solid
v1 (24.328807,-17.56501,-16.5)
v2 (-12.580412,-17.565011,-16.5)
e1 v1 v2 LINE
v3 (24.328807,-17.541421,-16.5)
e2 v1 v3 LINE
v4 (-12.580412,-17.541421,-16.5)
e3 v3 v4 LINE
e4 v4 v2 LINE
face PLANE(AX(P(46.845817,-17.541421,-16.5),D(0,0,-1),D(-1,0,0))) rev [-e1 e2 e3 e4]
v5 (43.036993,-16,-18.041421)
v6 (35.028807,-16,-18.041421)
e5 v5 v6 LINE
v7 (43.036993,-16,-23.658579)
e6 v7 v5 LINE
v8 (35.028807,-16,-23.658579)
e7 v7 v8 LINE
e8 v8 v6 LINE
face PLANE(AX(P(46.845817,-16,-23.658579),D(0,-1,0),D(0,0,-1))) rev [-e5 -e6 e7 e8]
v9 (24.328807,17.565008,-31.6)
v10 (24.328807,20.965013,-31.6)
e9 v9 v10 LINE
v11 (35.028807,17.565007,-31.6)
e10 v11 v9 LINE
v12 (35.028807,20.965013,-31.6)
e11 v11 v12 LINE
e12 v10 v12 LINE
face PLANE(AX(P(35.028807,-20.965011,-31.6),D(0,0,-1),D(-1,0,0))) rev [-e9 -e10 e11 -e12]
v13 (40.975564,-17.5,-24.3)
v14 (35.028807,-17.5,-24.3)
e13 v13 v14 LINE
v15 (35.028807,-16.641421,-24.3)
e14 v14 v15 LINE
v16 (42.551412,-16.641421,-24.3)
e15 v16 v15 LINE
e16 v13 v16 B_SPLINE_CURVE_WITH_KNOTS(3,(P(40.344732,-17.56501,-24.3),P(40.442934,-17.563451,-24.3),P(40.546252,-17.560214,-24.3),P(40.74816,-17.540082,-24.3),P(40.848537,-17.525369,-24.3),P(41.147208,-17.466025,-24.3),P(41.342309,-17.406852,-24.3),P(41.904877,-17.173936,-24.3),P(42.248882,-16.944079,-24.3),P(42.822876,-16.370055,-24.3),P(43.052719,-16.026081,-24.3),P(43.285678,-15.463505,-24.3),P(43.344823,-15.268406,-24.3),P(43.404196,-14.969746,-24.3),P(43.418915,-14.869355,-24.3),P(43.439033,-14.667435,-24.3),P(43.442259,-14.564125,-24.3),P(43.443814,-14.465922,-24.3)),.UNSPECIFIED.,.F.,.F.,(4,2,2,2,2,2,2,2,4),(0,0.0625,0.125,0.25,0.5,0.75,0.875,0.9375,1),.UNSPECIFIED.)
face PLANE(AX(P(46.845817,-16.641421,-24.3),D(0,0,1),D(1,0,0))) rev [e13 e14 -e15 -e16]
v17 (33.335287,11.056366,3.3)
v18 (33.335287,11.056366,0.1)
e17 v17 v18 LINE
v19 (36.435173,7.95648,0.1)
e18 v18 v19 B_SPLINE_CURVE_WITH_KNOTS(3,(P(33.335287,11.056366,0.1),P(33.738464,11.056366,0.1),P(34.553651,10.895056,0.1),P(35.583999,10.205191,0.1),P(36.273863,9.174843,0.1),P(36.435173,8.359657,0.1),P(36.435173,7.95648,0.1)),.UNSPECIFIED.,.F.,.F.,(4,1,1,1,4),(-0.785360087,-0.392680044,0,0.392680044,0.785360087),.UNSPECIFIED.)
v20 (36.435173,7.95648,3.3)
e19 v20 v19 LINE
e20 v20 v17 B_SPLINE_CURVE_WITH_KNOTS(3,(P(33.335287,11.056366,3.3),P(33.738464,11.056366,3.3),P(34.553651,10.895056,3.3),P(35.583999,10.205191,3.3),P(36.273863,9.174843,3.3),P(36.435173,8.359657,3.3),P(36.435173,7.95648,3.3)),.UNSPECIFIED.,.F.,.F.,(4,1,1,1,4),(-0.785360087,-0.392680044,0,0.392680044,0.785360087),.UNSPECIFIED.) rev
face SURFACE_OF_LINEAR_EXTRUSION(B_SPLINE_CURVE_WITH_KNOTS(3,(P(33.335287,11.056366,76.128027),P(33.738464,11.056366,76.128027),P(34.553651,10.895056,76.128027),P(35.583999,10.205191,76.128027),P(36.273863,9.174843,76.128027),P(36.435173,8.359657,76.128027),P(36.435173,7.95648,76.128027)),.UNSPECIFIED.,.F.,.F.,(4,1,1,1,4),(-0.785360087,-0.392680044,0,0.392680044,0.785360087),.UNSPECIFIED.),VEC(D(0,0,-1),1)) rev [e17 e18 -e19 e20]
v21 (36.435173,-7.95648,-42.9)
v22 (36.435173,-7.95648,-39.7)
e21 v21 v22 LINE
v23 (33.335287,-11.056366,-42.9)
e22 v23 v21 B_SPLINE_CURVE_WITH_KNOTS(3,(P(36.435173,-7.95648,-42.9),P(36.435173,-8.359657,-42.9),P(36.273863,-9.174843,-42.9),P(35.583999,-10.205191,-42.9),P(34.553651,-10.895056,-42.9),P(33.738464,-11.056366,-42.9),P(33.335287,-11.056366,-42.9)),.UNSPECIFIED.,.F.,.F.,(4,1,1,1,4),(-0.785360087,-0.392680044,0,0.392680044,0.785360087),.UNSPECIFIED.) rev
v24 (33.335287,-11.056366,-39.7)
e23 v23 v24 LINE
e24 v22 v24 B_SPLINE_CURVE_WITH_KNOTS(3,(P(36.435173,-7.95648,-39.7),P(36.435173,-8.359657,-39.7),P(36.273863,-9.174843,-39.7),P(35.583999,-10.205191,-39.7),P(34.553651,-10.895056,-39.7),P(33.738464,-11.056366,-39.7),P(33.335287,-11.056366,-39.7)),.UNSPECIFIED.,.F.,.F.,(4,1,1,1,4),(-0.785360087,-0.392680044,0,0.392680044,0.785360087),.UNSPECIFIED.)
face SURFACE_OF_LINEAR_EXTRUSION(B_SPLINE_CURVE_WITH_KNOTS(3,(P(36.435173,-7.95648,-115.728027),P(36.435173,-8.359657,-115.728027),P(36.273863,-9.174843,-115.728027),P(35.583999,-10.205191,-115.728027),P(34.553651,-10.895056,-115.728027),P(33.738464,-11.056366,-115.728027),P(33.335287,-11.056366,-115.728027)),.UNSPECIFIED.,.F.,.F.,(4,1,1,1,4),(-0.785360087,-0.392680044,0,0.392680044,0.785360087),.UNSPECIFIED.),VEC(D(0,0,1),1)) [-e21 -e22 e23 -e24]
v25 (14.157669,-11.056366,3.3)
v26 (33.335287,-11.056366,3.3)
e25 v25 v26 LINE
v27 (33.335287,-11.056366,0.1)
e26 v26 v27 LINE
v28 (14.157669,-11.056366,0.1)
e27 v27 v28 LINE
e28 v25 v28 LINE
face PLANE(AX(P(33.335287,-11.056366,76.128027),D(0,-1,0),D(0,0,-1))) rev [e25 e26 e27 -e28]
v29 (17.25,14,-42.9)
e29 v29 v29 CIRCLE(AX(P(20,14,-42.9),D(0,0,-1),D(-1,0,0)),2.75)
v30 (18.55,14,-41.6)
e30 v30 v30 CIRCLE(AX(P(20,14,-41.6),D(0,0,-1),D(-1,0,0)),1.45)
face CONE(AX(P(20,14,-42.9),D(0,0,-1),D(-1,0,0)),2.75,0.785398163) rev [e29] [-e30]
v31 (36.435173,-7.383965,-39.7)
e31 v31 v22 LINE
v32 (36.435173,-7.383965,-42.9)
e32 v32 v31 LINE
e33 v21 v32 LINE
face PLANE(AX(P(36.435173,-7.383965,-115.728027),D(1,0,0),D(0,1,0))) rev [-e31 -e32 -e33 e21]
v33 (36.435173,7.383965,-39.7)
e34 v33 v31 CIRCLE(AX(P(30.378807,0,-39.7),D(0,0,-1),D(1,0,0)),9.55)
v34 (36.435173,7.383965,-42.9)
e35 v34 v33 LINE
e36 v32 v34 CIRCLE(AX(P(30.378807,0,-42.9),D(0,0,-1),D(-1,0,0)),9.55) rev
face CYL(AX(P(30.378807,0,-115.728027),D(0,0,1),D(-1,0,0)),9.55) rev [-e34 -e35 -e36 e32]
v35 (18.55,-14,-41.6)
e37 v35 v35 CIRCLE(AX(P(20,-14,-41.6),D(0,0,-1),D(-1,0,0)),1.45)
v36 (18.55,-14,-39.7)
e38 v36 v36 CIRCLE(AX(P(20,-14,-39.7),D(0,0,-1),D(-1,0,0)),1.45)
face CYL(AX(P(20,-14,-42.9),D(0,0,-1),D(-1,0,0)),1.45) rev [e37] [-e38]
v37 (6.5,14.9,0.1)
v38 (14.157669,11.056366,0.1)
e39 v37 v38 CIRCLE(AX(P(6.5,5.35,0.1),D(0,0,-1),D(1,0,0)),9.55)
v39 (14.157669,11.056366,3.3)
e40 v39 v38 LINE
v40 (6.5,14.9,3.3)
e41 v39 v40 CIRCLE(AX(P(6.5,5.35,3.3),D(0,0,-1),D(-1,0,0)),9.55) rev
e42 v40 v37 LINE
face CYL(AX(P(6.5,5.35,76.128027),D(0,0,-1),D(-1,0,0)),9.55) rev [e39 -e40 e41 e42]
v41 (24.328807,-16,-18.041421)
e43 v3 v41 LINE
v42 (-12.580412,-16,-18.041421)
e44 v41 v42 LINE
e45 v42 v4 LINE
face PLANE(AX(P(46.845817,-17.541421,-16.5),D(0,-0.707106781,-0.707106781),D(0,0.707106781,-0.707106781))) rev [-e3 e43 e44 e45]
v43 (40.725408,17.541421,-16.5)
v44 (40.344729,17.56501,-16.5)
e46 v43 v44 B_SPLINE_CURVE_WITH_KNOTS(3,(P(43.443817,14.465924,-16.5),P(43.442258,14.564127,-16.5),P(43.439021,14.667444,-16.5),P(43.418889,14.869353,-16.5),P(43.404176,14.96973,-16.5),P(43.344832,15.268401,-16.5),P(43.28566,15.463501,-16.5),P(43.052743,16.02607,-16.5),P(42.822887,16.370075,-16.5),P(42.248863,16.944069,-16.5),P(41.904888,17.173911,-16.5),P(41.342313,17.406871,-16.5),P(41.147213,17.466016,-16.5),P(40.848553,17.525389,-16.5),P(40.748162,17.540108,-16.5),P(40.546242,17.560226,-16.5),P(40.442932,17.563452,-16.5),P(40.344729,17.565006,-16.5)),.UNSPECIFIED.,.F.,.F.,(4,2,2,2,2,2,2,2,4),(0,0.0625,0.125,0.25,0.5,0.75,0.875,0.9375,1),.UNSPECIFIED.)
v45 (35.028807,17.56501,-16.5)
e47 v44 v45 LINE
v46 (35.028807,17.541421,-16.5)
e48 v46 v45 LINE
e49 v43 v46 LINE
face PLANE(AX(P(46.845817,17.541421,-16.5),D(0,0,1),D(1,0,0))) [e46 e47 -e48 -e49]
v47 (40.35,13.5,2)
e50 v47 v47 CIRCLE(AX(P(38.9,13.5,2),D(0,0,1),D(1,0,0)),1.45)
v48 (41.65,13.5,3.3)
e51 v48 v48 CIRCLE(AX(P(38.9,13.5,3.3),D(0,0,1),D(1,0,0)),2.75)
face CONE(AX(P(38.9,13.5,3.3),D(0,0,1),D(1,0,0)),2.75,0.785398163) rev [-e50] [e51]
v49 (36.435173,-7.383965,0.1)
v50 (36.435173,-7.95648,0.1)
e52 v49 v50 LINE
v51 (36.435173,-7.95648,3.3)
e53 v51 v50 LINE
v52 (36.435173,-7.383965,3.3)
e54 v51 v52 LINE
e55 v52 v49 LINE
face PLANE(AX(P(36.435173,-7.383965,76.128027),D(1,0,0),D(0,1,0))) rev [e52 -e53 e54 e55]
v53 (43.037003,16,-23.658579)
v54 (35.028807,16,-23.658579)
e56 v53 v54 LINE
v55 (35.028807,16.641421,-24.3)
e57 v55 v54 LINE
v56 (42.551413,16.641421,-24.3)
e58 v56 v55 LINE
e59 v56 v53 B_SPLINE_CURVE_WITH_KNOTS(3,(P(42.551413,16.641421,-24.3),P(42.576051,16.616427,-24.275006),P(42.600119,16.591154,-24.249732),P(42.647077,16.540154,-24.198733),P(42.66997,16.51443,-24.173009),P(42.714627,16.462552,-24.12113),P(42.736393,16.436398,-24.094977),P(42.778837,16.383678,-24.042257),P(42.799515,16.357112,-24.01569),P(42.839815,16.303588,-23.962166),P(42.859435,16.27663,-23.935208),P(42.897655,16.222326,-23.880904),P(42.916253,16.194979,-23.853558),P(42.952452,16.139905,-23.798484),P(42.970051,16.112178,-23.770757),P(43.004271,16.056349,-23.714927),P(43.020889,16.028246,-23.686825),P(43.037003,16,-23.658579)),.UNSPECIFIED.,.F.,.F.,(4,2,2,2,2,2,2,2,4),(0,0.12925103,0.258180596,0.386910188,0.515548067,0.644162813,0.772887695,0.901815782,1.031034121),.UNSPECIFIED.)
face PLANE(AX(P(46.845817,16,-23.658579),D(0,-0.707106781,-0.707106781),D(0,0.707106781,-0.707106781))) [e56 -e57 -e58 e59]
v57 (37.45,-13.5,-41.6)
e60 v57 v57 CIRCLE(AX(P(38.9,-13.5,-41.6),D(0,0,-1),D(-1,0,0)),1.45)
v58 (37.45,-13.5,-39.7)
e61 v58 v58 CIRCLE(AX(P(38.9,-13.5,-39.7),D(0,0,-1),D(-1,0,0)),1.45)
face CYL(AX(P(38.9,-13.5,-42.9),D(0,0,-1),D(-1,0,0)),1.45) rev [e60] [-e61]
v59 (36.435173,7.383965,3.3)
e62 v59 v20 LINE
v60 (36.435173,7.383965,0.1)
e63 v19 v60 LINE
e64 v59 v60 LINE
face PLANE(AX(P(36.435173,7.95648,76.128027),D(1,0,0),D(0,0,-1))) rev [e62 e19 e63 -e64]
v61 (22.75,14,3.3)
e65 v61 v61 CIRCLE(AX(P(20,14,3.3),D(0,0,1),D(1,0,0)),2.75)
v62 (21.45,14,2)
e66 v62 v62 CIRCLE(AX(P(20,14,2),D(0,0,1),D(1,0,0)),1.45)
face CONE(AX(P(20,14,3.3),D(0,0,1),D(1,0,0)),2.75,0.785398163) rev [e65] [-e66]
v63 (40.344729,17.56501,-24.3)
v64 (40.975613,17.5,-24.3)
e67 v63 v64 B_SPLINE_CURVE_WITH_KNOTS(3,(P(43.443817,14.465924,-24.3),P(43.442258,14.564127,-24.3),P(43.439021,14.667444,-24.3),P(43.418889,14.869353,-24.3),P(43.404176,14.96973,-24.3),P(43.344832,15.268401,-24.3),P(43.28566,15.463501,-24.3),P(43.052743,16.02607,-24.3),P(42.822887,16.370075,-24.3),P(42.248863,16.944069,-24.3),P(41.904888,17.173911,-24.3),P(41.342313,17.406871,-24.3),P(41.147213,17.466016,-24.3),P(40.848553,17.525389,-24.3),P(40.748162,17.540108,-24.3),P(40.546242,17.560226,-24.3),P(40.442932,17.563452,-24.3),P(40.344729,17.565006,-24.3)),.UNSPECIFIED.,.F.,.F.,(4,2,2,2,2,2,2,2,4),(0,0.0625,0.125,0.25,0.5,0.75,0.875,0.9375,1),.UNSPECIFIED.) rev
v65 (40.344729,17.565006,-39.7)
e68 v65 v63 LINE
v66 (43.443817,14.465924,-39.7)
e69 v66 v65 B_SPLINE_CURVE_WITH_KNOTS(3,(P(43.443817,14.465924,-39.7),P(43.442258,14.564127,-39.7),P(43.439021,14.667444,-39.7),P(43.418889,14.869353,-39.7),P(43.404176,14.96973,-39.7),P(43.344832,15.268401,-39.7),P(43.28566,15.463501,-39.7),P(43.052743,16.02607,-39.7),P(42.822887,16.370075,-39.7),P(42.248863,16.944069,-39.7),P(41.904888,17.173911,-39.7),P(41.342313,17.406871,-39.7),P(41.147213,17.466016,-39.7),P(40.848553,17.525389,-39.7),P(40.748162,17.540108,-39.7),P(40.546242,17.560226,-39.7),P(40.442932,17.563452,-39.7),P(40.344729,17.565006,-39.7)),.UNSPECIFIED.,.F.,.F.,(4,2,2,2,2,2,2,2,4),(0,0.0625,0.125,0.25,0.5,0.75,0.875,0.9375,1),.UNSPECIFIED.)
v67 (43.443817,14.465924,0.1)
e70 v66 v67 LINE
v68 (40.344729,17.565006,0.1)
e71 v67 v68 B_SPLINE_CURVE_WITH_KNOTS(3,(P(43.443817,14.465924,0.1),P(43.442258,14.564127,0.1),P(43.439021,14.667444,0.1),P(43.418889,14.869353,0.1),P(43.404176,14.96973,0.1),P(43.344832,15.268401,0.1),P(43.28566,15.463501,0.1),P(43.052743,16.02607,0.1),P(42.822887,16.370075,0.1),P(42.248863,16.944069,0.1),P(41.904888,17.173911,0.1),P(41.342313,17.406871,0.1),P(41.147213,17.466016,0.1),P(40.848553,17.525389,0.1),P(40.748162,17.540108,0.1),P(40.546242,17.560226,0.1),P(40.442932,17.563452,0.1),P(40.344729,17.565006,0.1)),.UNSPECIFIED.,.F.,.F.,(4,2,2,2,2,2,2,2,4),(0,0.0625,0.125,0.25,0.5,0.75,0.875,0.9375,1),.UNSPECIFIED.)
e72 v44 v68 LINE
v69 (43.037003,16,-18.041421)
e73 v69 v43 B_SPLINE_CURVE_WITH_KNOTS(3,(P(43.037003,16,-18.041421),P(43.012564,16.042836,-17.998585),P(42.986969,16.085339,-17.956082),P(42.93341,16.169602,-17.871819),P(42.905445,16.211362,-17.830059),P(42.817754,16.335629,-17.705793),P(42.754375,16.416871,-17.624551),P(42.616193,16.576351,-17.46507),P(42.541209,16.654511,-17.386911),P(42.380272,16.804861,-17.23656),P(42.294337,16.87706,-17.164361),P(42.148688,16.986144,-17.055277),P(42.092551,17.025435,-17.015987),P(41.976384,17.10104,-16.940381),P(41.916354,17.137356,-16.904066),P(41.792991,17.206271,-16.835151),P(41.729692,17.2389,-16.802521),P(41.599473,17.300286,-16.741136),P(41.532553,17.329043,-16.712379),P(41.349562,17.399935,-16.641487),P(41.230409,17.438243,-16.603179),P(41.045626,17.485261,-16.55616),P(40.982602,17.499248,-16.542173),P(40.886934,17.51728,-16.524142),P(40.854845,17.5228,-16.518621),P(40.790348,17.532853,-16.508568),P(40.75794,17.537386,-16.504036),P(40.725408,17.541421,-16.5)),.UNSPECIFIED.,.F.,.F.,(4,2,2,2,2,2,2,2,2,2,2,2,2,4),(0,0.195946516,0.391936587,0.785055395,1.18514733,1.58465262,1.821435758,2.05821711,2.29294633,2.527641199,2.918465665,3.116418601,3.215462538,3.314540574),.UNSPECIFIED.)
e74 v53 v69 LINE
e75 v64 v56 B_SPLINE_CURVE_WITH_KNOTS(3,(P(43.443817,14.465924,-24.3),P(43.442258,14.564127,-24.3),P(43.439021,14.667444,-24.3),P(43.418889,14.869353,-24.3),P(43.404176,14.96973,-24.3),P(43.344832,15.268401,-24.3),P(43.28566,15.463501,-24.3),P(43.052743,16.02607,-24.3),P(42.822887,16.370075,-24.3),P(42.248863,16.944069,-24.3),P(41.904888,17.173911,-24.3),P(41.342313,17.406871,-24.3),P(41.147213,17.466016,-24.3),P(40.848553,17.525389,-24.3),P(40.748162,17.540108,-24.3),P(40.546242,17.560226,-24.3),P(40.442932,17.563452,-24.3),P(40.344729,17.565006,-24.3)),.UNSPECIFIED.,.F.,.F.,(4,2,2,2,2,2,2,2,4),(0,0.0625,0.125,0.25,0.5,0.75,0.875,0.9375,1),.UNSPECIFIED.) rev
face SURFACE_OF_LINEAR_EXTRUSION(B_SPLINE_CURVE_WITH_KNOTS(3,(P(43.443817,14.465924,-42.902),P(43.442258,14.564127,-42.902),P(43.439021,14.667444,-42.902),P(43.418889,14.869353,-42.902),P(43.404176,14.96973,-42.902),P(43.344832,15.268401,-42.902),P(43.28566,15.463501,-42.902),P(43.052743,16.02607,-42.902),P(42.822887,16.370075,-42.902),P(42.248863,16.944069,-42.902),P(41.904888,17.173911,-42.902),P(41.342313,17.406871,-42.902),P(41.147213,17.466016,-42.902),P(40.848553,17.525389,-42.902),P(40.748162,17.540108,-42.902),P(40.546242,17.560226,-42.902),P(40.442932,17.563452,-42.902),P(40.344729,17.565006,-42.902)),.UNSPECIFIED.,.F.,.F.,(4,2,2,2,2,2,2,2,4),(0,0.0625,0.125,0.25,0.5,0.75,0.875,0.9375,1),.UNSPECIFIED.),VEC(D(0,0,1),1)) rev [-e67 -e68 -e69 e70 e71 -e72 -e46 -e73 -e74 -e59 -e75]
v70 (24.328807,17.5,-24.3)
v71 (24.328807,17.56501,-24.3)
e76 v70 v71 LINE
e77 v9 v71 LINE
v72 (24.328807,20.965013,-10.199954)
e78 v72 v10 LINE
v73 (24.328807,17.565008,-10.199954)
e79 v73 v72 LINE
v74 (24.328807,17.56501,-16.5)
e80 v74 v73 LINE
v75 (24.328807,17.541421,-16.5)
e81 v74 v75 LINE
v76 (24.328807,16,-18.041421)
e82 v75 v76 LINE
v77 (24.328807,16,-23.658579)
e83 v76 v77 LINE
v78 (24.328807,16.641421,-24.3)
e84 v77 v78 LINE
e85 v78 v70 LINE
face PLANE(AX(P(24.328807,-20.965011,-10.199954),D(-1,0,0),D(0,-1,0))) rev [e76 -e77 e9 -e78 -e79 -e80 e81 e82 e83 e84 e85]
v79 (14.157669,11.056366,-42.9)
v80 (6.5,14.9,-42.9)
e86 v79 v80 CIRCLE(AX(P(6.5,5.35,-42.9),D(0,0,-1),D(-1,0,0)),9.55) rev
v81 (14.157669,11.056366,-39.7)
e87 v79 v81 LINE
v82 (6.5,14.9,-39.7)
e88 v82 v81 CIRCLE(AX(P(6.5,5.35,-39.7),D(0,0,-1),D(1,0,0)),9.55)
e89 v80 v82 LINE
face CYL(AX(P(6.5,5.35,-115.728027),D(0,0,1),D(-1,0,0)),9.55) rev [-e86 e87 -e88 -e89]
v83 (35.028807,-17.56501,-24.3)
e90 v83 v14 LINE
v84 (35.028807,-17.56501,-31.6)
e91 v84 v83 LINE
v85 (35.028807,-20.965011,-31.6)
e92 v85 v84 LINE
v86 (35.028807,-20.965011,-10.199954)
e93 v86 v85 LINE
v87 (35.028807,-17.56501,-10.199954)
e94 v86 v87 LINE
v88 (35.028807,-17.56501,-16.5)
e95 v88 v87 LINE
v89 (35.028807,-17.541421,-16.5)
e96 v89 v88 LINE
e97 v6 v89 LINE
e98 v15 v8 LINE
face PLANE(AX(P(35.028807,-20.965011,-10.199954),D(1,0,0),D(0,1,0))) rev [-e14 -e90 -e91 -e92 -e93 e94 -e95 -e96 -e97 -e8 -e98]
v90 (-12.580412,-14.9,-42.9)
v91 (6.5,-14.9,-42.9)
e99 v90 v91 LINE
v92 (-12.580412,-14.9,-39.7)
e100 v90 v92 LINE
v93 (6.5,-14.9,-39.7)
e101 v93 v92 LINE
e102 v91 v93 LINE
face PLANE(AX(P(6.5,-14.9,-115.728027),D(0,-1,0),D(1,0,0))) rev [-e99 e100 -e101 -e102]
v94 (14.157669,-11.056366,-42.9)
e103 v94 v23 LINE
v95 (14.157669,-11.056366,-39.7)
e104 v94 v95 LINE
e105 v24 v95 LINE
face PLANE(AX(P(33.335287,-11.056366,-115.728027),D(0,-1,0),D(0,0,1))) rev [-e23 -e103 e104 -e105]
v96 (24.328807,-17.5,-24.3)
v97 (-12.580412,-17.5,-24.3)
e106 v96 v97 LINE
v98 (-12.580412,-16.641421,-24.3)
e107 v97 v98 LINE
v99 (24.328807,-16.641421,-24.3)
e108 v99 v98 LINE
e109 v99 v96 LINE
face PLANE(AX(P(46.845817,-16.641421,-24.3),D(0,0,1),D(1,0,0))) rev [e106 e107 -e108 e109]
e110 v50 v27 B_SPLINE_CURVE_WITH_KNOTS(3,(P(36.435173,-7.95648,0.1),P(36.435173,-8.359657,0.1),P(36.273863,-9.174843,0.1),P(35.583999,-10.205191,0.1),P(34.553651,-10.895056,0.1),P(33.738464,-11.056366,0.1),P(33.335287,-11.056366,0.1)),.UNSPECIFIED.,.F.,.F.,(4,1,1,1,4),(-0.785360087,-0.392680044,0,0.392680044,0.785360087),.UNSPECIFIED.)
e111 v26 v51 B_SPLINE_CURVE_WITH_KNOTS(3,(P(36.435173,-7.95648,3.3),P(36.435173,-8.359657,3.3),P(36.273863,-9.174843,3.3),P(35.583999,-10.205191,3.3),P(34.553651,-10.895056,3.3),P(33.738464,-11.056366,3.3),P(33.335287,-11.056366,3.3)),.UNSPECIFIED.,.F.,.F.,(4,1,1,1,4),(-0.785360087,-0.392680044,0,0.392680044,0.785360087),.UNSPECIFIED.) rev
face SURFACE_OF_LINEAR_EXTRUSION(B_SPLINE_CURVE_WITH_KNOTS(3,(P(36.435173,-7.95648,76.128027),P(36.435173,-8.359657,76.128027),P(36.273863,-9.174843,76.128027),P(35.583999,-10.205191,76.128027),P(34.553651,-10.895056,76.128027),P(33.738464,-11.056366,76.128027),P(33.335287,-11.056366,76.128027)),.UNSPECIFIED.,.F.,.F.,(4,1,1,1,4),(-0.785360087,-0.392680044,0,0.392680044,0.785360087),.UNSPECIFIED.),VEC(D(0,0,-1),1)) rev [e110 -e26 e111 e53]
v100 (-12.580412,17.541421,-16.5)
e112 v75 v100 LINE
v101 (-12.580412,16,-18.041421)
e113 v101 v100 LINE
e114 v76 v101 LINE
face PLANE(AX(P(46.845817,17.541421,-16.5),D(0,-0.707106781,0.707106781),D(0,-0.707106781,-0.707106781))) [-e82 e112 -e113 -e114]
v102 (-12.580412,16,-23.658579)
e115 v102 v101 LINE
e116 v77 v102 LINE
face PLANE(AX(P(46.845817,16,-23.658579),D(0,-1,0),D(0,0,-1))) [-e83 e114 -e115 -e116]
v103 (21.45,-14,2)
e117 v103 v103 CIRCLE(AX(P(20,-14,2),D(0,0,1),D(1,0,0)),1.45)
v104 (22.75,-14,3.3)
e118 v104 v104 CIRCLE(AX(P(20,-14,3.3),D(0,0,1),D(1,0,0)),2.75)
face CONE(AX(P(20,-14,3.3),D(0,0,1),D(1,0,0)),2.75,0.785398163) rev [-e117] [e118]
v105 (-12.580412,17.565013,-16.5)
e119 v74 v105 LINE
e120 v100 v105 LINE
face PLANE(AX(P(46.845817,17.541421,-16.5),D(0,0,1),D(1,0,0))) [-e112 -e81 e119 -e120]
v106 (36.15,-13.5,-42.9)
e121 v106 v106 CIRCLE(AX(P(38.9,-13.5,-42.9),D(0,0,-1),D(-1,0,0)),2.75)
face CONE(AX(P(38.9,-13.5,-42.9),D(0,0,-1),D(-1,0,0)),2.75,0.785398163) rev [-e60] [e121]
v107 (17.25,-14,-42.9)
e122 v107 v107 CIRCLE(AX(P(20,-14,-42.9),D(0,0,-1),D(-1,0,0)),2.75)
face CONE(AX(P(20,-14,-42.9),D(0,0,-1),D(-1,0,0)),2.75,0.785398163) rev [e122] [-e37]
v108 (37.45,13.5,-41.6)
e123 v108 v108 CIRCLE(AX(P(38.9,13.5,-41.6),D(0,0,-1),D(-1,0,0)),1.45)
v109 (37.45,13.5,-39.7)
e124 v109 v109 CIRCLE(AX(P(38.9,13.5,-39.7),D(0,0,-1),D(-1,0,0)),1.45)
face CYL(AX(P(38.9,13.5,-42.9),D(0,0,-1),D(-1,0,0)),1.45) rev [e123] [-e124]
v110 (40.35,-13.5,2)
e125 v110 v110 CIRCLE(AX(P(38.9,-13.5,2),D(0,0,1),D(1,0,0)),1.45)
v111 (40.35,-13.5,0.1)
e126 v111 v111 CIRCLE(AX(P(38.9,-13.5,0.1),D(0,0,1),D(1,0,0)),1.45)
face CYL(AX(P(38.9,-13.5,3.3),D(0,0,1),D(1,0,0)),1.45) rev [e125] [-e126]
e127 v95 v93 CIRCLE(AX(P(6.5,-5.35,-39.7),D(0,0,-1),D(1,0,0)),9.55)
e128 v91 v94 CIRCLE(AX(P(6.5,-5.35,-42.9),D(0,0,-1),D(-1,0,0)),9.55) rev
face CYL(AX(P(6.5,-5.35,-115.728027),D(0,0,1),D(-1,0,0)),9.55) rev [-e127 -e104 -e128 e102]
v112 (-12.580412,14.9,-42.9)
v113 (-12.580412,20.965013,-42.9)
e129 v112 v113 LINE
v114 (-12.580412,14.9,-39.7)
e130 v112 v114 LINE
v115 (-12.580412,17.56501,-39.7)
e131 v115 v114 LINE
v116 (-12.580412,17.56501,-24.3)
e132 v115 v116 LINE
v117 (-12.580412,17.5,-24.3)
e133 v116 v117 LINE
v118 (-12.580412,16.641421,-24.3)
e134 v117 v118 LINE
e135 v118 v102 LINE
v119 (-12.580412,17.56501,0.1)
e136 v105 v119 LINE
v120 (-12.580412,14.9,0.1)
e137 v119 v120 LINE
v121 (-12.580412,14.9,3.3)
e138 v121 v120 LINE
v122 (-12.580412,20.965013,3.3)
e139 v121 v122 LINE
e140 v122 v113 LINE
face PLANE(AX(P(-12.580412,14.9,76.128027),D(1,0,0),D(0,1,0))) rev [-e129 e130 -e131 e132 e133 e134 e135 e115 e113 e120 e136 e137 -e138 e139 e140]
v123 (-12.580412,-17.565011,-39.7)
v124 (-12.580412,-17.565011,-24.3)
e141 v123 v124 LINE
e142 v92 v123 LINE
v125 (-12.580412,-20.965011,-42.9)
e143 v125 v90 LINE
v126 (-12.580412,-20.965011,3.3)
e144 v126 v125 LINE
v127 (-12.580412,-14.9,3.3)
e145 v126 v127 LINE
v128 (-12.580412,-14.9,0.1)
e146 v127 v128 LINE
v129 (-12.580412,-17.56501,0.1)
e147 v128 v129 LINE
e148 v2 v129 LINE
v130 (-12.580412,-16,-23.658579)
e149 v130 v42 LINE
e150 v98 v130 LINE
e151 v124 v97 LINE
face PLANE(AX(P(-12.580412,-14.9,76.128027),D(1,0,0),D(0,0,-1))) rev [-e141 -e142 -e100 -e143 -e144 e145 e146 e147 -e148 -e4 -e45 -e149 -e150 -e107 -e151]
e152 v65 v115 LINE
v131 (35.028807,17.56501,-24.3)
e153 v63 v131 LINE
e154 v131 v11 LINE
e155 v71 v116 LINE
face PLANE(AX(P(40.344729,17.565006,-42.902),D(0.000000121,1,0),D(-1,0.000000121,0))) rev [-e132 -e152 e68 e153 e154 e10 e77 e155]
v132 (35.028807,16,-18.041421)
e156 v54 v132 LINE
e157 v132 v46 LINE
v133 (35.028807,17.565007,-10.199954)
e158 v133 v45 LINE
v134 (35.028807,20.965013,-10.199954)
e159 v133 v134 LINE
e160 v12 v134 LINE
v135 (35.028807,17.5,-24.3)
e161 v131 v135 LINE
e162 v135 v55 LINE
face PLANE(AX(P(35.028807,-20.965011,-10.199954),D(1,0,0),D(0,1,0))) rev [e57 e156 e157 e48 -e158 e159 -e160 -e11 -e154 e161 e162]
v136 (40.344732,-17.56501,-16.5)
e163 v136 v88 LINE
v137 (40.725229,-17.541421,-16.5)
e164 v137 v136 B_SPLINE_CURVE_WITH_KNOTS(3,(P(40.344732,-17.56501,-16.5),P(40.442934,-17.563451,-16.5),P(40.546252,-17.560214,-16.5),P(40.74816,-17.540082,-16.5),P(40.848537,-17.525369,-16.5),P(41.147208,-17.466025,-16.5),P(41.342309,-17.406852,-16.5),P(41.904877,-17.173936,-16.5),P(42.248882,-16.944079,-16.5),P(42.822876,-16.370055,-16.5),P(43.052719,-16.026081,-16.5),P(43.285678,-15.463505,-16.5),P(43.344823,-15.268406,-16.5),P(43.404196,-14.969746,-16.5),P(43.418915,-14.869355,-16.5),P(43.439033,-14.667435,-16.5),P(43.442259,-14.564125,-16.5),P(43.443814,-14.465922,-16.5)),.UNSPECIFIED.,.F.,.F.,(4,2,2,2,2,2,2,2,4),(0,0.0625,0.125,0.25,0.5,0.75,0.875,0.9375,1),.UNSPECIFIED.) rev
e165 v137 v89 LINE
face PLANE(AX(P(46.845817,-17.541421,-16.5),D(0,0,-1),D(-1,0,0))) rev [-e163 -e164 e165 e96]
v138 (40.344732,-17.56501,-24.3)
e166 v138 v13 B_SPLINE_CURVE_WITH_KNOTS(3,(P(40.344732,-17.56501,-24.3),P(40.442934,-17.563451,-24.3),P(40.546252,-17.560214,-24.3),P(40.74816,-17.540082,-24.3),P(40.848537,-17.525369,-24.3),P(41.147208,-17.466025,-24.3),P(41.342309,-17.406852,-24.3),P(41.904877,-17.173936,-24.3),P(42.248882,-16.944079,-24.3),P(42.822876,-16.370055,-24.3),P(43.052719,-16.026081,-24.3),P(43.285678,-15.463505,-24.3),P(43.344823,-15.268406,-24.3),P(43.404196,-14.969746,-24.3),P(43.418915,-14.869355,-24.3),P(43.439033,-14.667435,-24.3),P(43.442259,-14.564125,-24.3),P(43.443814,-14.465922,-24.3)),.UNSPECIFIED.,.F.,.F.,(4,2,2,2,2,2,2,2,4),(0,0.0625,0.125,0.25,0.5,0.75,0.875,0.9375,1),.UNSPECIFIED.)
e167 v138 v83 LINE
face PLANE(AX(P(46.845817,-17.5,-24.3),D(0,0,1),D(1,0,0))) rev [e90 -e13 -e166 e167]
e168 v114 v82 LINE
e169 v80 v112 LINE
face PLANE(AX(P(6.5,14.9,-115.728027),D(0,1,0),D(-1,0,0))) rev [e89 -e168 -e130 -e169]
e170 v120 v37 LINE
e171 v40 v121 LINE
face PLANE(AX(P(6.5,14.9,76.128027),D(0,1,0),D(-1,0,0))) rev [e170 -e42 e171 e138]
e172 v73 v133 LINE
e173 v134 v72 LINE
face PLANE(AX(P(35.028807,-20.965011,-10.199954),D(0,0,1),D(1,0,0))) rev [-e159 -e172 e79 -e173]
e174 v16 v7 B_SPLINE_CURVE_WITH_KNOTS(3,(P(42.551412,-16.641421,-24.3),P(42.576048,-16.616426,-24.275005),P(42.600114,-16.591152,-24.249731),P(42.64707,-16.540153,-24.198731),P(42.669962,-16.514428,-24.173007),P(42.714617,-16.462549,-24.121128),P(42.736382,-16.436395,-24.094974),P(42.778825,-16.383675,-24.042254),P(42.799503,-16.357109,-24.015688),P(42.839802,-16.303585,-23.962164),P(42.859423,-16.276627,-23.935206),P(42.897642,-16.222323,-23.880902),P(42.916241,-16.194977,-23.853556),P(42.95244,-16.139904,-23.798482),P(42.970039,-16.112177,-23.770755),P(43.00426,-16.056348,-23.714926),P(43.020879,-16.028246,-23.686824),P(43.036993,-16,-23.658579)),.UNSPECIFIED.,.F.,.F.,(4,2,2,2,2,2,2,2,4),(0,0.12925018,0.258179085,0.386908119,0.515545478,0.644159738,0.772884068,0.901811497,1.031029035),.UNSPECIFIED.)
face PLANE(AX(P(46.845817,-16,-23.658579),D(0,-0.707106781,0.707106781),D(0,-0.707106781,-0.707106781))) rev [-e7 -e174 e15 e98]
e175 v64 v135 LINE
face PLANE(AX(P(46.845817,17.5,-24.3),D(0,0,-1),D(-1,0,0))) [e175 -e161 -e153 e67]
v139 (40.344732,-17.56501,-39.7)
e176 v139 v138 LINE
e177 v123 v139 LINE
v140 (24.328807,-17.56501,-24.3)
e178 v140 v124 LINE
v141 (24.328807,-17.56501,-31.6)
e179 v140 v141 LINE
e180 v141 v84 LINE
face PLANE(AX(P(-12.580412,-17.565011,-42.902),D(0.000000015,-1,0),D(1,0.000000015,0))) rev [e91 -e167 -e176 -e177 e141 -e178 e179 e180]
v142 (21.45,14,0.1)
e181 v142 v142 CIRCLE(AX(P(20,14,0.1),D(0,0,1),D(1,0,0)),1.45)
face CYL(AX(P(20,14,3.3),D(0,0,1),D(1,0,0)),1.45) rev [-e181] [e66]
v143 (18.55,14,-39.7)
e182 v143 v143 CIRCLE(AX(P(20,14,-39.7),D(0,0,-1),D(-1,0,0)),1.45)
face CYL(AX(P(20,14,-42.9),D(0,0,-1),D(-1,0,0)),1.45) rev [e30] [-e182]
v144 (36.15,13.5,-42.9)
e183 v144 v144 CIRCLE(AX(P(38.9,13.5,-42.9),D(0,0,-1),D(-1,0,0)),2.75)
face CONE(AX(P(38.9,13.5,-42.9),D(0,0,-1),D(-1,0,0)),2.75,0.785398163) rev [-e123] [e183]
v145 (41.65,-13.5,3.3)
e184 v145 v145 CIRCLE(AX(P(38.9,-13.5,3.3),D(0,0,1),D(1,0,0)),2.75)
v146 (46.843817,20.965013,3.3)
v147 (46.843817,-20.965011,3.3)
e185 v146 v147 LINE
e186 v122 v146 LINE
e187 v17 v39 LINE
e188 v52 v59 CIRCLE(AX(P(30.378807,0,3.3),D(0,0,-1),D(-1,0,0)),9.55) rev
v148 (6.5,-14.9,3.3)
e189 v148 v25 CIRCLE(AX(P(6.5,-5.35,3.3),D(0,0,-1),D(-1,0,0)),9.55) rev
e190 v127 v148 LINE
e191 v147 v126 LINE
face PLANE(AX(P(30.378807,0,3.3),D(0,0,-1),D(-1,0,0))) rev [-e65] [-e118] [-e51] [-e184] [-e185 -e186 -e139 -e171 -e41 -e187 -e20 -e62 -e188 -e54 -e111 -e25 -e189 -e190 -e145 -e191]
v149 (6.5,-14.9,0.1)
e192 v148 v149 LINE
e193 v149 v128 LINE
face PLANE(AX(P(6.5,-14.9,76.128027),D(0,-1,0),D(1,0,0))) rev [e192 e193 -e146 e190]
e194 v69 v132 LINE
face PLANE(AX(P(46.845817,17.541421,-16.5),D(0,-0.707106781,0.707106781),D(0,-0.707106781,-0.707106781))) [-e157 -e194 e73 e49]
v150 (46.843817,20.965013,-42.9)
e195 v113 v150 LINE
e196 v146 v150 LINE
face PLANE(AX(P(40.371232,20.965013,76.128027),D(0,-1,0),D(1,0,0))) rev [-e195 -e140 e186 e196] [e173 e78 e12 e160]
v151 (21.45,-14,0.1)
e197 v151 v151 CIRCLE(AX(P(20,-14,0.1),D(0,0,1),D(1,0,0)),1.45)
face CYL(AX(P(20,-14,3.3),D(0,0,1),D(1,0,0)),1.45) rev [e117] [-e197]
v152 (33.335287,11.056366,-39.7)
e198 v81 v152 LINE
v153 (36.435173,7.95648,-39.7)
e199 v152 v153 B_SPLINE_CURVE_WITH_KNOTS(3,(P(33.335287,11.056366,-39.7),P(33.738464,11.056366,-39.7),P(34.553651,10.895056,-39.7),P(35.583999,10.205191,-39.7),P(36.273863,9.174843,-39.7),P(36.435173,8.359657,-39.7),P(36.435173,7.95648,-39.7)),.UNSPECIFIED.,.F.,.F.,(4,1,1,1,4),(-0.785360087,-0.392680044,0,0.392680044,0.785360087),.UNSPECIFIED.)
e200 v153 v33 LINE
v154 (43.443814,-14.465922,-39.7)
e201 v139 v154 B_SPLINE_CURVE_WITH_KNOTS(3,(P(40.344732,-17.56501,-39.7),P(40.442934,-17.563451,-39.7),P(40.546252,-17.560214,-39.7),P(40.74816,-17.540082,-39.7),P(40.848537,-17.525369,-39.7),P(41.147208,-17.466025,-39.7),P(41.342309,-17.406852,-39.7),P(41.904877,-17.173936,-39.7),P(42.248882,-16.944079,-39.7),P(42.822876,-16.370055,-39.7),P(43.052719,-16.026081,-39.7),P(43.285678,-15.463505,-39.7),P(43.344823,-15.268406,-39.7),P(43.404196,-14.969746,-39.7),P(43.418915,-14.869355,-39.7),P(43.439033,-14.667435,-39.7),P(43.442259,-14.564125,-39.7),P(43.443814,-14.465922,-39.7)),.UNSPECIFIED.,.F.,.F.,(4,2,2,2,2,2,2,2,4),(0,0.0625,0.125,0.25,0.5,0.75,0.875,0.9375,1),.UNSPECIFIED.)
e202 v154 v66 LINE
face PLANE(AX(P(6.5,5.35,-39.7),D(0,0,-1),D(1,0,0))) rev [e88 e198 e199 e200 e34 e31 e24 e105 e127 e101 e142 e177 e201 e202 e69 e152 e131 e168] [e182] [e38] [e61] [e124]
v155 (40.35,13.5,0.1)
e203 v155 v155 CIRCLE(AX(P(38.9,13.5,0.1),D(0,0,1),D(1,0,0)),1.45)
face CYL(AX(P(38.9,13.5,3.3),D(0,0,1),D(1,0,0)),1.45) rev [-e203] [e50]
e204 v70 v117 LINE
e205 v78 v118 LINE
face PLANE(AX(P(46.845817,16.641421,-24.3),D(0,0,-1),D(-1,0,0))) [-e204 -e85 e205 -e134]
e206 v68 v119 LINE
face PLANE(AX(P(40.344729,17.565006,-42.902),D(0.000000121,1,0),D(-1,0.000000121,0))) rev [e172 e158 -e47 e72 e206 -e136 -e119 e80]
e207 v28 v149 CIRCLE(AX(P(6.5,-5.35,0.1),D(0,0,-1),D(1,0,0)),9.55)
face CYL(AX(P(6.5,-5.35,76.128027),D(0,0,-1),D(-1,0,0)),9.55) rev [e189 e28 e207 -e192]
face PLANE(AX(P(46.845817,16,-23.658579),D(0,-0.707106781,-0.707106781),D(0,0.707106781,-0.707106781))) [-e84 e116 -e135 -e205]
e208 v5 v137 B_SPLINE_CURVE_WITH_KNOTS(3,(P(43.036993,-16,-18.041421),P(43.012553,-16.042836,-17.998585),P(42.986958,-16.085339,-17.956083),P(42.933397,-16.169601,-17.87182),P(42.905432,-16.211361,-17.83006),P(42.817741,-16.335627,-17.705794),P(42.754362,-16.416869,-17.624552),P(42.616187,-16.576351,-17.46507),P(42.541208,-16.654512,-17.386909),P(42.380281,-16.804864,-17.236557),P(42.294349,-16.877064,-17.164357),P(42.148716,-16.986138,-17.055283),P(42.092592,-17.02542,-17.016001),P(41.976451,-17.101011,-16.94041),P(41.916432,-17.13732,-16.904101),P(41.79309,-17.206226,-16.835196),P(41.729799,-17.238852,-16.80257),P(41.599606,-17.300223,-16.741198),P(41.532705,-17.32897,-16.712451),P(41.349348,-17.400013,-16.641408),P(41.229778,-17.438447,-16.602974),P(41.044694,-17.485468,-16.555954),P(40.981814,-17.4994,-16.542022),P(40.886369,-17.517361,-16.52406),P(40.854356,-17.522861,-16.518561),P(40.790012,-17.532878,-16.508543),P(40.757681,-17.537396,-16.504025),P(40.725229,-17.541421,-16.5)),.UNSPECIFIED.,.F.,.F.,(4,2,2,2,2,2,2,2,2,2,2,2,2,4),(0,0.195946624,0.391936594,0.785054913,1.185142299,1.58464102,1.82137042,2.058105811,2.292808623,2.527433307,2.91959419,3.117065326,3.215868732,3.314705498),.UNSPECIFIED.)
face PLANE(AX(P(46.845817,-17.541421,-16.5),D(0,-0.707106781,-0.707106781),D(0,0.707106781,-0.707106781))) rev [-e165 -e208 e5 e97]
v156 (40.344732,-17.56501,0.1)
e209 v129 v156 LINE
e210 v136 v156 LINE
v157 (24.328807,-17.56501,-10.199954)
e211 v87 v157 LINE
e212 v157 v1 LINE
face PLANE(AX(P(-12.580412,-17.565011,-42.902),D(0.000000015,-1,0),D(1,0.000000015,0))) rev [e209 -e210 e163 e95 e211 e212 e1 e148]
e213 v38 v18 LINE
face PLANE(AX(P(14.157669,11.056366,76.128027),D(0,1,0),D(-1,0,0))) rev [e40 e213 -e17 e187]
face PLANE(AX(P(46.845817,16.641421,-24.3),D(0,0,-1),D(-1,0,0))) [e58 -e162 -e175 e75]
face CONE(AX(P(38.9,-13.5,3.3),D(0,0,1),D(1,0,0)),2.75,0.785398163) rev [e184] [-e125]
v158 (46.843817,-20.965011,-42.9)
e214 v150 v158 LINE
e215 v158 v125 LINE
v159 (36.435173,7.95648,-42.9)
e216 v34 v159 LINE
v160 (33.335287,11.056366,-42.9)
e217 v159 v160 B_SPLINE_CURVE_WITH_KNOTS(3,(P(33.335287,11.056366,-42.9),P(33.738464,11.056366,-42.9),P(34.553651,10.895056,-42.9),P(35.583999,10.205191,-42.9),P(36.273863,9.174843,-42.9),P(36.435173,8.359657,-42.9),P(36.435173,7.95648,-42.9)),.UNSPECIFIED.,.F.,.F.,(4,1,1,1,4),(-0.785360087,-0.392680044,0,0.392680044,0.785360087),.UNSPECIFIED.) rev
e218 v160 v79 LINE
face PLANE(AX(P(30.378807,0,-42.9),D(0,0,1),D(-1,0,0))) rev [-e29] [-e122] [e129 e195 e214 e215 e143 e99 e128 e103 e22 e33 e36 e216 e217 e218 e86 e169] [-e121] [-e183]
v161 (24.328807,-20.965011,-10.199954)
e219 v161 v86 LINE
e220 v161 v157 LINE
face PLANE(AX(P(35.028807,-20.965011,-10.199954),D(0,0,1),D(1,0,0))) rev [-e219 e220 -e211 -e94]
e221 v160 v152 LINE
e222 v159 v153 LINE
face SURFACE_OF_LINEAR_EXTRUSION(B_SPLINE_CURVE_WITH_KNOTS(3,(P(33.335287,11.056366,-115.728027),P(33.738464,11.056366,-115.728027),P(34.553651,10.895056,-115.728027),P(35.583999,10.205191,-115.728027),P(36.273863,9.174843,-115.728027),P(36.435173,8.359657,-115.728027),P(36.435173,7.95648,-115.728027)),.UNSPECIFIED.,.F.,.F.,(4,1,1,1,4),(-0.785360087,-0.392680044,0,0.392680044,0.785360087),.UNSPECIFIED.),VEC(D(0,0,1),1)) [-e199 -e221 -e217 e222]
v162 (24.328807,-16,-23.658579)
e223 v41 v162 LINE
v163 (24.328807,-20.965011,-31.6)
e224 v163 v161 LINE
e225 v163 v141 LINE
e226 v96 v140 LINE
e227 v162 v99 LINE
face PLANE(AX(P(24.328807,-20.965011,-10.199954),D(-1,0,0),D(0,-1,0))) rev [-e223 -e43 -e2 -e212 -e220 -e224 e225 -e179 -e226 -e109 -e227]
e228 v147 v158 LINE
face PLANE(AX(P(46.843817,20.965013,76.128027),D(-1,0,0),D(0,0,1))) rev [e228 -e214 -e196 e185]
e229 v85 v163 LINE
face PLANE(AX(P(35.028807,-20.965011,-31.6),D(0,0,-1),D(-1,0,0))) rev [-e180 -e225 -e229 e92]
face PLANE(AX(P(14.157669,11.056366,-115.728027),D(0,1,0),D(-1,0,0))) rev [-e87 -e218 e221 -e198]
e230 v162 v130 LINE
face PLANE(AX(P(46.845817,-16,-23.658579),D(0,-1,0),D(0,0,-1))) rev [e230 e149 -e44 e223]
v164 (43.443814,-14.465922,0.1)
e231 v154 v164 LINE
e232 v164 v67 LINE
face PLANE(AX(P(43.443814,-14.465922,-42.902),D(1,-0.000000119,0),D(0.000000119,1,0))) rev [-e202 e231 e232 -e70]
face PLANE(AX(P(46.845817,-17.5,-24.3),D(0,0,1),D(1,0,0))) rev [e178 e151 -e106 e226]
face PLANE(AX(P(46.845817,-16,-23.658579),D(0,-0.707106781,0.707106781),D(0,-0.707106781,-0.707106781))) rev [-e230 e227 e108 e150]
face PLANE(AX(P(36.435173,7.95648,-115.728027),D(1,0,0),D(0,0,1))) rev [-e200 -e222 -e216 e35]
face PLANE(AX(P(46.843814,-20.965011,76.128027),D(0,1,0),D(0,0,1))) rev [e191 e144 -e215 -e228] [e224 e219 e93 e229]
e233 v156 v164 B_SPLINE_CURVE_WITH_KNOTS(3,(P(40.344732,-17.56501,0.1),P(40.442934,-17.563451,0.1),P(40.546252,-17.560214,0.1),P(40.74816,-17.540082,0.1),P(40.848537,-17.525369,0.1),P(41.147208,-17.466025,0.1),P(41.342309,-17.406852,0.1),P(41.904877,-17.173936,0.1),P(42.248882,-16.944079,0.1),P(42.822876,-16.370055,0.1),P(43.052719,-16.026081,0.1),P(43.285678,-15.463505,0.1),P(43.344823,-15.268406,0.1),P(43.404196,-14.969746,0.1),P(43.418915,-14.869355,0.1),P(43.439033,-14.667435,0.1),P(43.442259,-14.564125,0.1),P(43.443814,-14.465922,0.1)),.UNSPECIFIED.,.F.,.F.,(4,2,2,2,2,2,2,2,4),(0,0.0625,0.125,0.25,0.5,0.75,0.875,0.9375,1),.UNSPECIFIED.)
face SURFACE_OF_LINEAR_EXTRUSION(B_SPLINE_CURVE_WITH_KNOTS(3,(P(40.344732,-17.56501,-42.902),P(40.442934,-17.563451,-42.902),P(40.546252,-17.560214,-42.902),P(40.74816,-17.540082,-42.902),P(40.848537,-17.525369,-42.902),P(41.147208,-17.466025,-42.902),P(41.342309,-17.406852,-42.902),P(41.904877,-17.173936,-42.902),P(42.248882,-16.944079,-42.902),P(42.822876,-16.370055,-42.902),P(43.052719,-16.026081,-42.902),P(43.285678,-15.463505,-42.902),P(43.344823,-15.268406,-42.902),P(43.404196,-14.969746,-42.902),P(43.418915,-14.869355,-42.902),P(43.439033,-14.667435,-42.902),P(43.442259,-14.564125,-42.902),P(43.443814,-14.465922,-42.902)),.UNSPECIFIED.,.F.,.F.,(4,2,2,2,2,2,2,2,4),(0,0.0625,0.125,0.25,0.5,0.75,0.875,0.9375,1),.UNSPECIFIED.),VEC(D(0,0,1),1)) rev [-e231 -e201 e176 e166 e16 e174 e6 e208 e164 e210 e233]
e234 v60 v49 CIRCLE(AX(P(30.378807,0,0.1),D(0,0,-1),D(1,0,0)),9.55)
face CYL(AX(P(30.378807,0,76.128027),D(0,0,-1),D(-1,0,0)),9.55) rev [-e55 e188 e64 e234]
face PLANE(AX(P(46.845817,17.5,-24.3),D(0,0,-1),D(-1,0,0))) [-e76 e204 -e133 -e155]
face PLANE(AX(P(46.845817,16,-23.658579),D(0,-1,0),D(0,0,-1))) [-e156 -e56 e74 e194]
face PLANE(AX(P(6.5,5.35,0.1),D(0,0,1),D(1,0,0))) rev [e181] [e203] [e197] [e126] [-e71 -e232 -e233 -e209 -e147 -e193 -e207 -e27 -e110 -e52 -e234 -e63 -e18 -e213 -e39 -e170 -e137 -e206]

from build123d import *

# Parameters (mm, degrees)
BOSS_EXTRUDE1_START = 0.1
BOSS_EXTRUDE1_DEPTH = 3.2
BOSS_EXTRUDE4_DEPTH = 43
MIRROR9_START       = -12.580412483
MIRROR9_DEPTH       = 56.024226278
CUT_EXTRUDE1_START  = -41.930024
SKETCH5_W           = 10.7
SKETCH5_H           = 21.400046012
CUT_EXTRUDE1_DEPTH  = 41.930024


with BuildPart() as part:
    # Sketch1 → Boss-Extrude1 (new body)
    with BuildSketch(Plane.XY.offset(BOSS_EXTRUDE1_START)):
        with BuildLine():
            Line((6.5, -20.96501071), (40.371666845, -20.96501071))
            Line((40.371666845, -20.96501071), (46.843813692, -20.96501071))
            Line((46.843813692, -20.96501071), (46.843813692, -14.492829244))
            Line((46.843813692, -14.492829244), (46.843817152, 14.492909287))
            Line((46.843817152, 14.492909287), (46.843817152, 20.965012858))
            Line((46.843817152, 20.965012858), (40.371232335, 20.965012858))
            Line((40.371232335, 20.965012858), (-12.580412483, 20.965012858))
            Line((-12.580412483, 20.965012858), (-12.580412483, 14.9))
            Line((-12.580412483, 14.9), (6.5, 14.9))
            ThreePointArc((6.5, 14.9), (10.784081461, 13.885171119), (14.157668767, 11.056365661))
            Line((14.157668767, 11.056365661), (33.335287122, 11.056365661))
            add(Edge.make_bspline(
                [(33.335287122, 11.056365661), (33.738464028, 11.056365661), (34.553650563, 10.895055506), (35.583998517, 10.205191286), (36.273862737, 9.174843333), (36.435172892, 8.359656798), (36.435172892, 7.956479892)],
                knots=[-0.785360087, -0.785360087, -0.785360087, -0.785360087, -0.392680044, 0, 0.392680044, 0.785360087, 0.785360087, 0.785360087, 0.785360087], degree=3))
            Line((36.435172892, 7.956479892), (36.435172892, 7.38396472))
            ThreePointArc((36.435172892, 7.38396472), (39.928807231, 0), (36.435172892, -7.38396472))
            Line((36.435172892, -7.38396472), (36.435172892, -7.956479892))
            add(Edge.make_bspline(
                [(36.435172892, -7.956479892), (36.435172892, -8.359656798), (36.273862737, -9.174843333), (35.583998517, -10.205191286), (34.553650563, -10.895055506), (33.738464028, -11.056365661), (33.335287122, -11.056365661)],
                knots=[-0.785360087, -0.785360087, -0.785360087, -0.785360087, -0.392680044, 0, 0.392680044, 0.785360087, 0.785360087, 0.785360087, 0.785360087], degree=3))
            Line((33.335287122, -11.056365661), (14.157668767, -11.056365661))
            ThreePointArc((14.157668767, -11.056365661), (10.784081461, -13.885171119), (6.5, -14.9))
            Line((6.5, -14.9), (-12.580412483, -14.9))
            Line((-12.580412483, -14.9), (-12.580412483, -20.96501071))
            Line((-12.580412483, -20.96501071), (6.5, -20.96501071))
        make_face()
    extrude(amount=BOSS_EXTRUDE1_DEPTH)


with BuildPart() as body_2:
    # Mirror8: mirrored copy
    add(part.part.mirror(Plane.XY.offset(-19.8)))


with BuildPart() as part_1:
    add(part.part)

    add(body_2.part)  # Boss-Extrude4 merges body 2
    # Sketch3 → Boss-Extrude4 (add)
    with BuildSketch(Plane(origin=(0, 0, 0.1), x_dir=(-1, 0, 0), z_dir=(0, 0, -1))):
        with BuildLine():
            Line((-46.843817152, -20.96501071), (12.580412483, -20.96501071))
            Line((12.580412483, -20.96501071), (12.580412481, -17.56501071))
            Line((12.580412481, -17.56501071), (-40.344731515, -17.565009918))
            add(Edge.make_bspline(
                [(-40.344731515, -17.565009918), (-40.442934479, -17.56345098), (-40.546251638, -17.560214099), (-40.748160222, -17.540082036), (-40.848537497, -17.525369256), (-41.147208229, -17.466024859), (-41.34230873, -17.40685234), (-41.904876795, -17.173936033), (-42.248881792, -16.944079436), (-42.822875895, -16.370055351), (-43.052718695, -16.026081256), (-43.285678392, -15.463505278), (-43.344823049, -15.268405947), (-43.404196351, -14.969745759), (-43.418915361, -14.869354632), (-43.439033339, -14.667434906), (-43.442259272, -14.564125008), (-43.443813695, -14.465921992)],
                knots=[0, 0, 0, 0, 0.0625, 0.0625, 0.125, 0.125, 0.25, 0.25, 0.5, 0.5, 0.75, 0.75, 0.875, 0.875, 0.9375, 0.9375, 1, 1, 1, 1], degree=3))
            Line((-43.443813695, -14.465921992), (-43.443817149, 14.465924278))
            add(Edge.make_bspline(
                [(-43.443817149, 14.465924278), (-43.442258211, 14.564127242), (-43.43902133, 14.6674444), (-43.418889268, 14.869352985), (-43.404176488, 14.969730261), (-43.344832091, 15.268400993), (-43.285659572, 15.463501494), (-43.052743266, 16.026069561), (-42.822886669, 16.370074559), (-42.248862584, 16.944068663), (-41.904888488, 17.173911463), (-41.342312509, 17.406871161), (-41.147213178, 17.466015819), (-40.84855299, 17.52538912), (-40.748161863, 17.54010813), (-40.546242137, 17.560226109), (-40.442932239, 17.563452042), (-40.344729223, 17.565006465)],
                knots=[0, 0, 0, 0, 0.0625, 0.0625, 0.125, 0.125, 0.25, 0.25, 0.5, 0.5, 0.75, 0.75, 0.875, 0.875, 0.9375, 0.9375, 1, 1, 1, 1], degree=3))
            Line((-40.344729223, 17.565006465), (12.580412471, 17.565012858))
            Line((12.580412471, 17.565012858), (12.580412483, 20.965012858))
            Line((12.580412483, 20.965012858), (-46.843817152, 20.965012858))
            Line((-46.843817152, 20.965012858), (-46.843817152, -20.96501071))
        make_face()
    extrude(amount=BOSS_EXTRUDE4_DEPTH)


with BuildPart() as mirror9_tool:
    # Mirror9: read off the stored shape, not the designer's step
    # Mirror9 outline → Mirror9 (new body)
    with BuildSketch(Plane.YZ.offset(MIRROR9_START)):
        Polygon((17.541421356, -16.5), (16, -18.041421356), (16, -23.658578644), (16.641421356, -24.3), (17.565009661, -24.3), (17.565007122, -16.5), align=None)
        Polygon((-17.56501071, -24.3), (-16.641421356, -24.3), (-16, -23.658578644), (-16, -18.041421356), (-17.541421356, -16.5), (-17.56501071, -16.5), align=None)
    extrude(amount=MIRROR9_DEPTH)


with BuildPart() as part_2:
    add(part_1.part)


with BuildPart() as part_3:
    # Mirror9: joined with mirror9_tool
    add(part_2.part.fuse(mirror9_tool.part, tol=0.00001))

    # Sketch5 → Cut-Extrude1 (cut)
    with BuildSketch(Plane(origin=(0, 20.965012858, 0), x_dir=(1, 0, 0), z_dir=(0, 1, 0)).offset(CUT_EXTRUDE1_START)):
        with Locations((29.678807231, 20.899976994)):
            Rectangle(SKETCH5_W, SKETCH5_H)
    extrude(amount=CUT_EXTRUDE1_DEPTH, mode=Mode.SUBTRACT)

    # CSK for M2.5 Countersunk Flat Head Screw1: read off the stored shape, not the designer's step
    # CSK for M2.5 Countersunk Flat Head S 2 → CSK for M2.5 Countersunk Flat Head Screw1 (revolve, cut)
    with BuildSketch(Plane(origin=(20, -14, 0), x_dir=(1, 0, 0), z_dir=(0, -1, 0))):
        Polygon((1.45, -41.6), (1.45, -39.7), (0, -39.7), (0, -42.9), (2.75, -42.9), align=None)
        Polygon((0, 0.1), (1.45, 0.1), (1.45, 2), (2.75, 3.3), (0, 3.3), align=None)
    revolve(axis=Axis((20, -14, 0), (0, 0, 1)), mode=Mode.SUBTRACT)

    # CSK for M2.5 Countersunk Flat Head S 3 o → CSK for M2.5 Countersunk Flat Head S 3 (revolve, cut)
    with BuildSketch(Plane(origin=(20, 14, 0), x_dir=(1, 0, 0), z_dir=(0, -1, 0))):
        Polygon((1.45, -41.6), (1.45, -39.7), (0, -39.7), (0, -42.9), (2.75, -42.9), align=None)
        Polygon((0, 0.1), (1.45, 0.1), (1.45, 2), (2.75, 3.3), (0, 3.3), align=None)
    revolve(axis=Axis((20, 14, 0), (0, 0, 1)), mode=Mode.SUBTRACT)

    # CSK for M2.5 Countersunk Flat Head S 4 o → CSK for M2.5 Countersunk Flat Head S 4 (revolve, cut)
    with BuildSketch(Plane(origin=(38.9, 13.5, 0), x_dir=(1, 0, 0), z_dir=(0, -1, 0))):
        Polygon((1.45, -41.6), (1.45, -39.7), (0, -39.7), (0, -42.9), (2.75, -42.9), align=None)
        Polygon((0, 0.1), (1.45, 0.1), (1.45, 2), (2.75, 3.3), (0, 3.3), align=None)
    revolve(axis=Axis((38.9, 13.5, 0), (0, 0, 1)), mode=Mode.SUBTRACT)

    # CSK for M2.5 Countersunk Flat Head S 5 o → CSK for M2.5 Countersunk Flat Head S 5 (revolve, cut)
    with BuildSketch(Plane(origin=(38.9, -13.5, 0), x_dir=(1, 0, 0), z_dir=(0, -1, 0))):
        Polygon((1.45, -41.6), (1.45, -39.7), (0, -39.7), (0, -42.9), (2.75, -42.9), align=None)
        Polygon((0, 0.1), (1.45, 0.1), (1.45, 2), (2.75, 3.3), (0, 3.3), align=None)
    revolve(axis=Axis((38.9, -13.5, 0), (0, 0, 1)), mode=Mode.SUBTRACT)


solid = part_3.part
